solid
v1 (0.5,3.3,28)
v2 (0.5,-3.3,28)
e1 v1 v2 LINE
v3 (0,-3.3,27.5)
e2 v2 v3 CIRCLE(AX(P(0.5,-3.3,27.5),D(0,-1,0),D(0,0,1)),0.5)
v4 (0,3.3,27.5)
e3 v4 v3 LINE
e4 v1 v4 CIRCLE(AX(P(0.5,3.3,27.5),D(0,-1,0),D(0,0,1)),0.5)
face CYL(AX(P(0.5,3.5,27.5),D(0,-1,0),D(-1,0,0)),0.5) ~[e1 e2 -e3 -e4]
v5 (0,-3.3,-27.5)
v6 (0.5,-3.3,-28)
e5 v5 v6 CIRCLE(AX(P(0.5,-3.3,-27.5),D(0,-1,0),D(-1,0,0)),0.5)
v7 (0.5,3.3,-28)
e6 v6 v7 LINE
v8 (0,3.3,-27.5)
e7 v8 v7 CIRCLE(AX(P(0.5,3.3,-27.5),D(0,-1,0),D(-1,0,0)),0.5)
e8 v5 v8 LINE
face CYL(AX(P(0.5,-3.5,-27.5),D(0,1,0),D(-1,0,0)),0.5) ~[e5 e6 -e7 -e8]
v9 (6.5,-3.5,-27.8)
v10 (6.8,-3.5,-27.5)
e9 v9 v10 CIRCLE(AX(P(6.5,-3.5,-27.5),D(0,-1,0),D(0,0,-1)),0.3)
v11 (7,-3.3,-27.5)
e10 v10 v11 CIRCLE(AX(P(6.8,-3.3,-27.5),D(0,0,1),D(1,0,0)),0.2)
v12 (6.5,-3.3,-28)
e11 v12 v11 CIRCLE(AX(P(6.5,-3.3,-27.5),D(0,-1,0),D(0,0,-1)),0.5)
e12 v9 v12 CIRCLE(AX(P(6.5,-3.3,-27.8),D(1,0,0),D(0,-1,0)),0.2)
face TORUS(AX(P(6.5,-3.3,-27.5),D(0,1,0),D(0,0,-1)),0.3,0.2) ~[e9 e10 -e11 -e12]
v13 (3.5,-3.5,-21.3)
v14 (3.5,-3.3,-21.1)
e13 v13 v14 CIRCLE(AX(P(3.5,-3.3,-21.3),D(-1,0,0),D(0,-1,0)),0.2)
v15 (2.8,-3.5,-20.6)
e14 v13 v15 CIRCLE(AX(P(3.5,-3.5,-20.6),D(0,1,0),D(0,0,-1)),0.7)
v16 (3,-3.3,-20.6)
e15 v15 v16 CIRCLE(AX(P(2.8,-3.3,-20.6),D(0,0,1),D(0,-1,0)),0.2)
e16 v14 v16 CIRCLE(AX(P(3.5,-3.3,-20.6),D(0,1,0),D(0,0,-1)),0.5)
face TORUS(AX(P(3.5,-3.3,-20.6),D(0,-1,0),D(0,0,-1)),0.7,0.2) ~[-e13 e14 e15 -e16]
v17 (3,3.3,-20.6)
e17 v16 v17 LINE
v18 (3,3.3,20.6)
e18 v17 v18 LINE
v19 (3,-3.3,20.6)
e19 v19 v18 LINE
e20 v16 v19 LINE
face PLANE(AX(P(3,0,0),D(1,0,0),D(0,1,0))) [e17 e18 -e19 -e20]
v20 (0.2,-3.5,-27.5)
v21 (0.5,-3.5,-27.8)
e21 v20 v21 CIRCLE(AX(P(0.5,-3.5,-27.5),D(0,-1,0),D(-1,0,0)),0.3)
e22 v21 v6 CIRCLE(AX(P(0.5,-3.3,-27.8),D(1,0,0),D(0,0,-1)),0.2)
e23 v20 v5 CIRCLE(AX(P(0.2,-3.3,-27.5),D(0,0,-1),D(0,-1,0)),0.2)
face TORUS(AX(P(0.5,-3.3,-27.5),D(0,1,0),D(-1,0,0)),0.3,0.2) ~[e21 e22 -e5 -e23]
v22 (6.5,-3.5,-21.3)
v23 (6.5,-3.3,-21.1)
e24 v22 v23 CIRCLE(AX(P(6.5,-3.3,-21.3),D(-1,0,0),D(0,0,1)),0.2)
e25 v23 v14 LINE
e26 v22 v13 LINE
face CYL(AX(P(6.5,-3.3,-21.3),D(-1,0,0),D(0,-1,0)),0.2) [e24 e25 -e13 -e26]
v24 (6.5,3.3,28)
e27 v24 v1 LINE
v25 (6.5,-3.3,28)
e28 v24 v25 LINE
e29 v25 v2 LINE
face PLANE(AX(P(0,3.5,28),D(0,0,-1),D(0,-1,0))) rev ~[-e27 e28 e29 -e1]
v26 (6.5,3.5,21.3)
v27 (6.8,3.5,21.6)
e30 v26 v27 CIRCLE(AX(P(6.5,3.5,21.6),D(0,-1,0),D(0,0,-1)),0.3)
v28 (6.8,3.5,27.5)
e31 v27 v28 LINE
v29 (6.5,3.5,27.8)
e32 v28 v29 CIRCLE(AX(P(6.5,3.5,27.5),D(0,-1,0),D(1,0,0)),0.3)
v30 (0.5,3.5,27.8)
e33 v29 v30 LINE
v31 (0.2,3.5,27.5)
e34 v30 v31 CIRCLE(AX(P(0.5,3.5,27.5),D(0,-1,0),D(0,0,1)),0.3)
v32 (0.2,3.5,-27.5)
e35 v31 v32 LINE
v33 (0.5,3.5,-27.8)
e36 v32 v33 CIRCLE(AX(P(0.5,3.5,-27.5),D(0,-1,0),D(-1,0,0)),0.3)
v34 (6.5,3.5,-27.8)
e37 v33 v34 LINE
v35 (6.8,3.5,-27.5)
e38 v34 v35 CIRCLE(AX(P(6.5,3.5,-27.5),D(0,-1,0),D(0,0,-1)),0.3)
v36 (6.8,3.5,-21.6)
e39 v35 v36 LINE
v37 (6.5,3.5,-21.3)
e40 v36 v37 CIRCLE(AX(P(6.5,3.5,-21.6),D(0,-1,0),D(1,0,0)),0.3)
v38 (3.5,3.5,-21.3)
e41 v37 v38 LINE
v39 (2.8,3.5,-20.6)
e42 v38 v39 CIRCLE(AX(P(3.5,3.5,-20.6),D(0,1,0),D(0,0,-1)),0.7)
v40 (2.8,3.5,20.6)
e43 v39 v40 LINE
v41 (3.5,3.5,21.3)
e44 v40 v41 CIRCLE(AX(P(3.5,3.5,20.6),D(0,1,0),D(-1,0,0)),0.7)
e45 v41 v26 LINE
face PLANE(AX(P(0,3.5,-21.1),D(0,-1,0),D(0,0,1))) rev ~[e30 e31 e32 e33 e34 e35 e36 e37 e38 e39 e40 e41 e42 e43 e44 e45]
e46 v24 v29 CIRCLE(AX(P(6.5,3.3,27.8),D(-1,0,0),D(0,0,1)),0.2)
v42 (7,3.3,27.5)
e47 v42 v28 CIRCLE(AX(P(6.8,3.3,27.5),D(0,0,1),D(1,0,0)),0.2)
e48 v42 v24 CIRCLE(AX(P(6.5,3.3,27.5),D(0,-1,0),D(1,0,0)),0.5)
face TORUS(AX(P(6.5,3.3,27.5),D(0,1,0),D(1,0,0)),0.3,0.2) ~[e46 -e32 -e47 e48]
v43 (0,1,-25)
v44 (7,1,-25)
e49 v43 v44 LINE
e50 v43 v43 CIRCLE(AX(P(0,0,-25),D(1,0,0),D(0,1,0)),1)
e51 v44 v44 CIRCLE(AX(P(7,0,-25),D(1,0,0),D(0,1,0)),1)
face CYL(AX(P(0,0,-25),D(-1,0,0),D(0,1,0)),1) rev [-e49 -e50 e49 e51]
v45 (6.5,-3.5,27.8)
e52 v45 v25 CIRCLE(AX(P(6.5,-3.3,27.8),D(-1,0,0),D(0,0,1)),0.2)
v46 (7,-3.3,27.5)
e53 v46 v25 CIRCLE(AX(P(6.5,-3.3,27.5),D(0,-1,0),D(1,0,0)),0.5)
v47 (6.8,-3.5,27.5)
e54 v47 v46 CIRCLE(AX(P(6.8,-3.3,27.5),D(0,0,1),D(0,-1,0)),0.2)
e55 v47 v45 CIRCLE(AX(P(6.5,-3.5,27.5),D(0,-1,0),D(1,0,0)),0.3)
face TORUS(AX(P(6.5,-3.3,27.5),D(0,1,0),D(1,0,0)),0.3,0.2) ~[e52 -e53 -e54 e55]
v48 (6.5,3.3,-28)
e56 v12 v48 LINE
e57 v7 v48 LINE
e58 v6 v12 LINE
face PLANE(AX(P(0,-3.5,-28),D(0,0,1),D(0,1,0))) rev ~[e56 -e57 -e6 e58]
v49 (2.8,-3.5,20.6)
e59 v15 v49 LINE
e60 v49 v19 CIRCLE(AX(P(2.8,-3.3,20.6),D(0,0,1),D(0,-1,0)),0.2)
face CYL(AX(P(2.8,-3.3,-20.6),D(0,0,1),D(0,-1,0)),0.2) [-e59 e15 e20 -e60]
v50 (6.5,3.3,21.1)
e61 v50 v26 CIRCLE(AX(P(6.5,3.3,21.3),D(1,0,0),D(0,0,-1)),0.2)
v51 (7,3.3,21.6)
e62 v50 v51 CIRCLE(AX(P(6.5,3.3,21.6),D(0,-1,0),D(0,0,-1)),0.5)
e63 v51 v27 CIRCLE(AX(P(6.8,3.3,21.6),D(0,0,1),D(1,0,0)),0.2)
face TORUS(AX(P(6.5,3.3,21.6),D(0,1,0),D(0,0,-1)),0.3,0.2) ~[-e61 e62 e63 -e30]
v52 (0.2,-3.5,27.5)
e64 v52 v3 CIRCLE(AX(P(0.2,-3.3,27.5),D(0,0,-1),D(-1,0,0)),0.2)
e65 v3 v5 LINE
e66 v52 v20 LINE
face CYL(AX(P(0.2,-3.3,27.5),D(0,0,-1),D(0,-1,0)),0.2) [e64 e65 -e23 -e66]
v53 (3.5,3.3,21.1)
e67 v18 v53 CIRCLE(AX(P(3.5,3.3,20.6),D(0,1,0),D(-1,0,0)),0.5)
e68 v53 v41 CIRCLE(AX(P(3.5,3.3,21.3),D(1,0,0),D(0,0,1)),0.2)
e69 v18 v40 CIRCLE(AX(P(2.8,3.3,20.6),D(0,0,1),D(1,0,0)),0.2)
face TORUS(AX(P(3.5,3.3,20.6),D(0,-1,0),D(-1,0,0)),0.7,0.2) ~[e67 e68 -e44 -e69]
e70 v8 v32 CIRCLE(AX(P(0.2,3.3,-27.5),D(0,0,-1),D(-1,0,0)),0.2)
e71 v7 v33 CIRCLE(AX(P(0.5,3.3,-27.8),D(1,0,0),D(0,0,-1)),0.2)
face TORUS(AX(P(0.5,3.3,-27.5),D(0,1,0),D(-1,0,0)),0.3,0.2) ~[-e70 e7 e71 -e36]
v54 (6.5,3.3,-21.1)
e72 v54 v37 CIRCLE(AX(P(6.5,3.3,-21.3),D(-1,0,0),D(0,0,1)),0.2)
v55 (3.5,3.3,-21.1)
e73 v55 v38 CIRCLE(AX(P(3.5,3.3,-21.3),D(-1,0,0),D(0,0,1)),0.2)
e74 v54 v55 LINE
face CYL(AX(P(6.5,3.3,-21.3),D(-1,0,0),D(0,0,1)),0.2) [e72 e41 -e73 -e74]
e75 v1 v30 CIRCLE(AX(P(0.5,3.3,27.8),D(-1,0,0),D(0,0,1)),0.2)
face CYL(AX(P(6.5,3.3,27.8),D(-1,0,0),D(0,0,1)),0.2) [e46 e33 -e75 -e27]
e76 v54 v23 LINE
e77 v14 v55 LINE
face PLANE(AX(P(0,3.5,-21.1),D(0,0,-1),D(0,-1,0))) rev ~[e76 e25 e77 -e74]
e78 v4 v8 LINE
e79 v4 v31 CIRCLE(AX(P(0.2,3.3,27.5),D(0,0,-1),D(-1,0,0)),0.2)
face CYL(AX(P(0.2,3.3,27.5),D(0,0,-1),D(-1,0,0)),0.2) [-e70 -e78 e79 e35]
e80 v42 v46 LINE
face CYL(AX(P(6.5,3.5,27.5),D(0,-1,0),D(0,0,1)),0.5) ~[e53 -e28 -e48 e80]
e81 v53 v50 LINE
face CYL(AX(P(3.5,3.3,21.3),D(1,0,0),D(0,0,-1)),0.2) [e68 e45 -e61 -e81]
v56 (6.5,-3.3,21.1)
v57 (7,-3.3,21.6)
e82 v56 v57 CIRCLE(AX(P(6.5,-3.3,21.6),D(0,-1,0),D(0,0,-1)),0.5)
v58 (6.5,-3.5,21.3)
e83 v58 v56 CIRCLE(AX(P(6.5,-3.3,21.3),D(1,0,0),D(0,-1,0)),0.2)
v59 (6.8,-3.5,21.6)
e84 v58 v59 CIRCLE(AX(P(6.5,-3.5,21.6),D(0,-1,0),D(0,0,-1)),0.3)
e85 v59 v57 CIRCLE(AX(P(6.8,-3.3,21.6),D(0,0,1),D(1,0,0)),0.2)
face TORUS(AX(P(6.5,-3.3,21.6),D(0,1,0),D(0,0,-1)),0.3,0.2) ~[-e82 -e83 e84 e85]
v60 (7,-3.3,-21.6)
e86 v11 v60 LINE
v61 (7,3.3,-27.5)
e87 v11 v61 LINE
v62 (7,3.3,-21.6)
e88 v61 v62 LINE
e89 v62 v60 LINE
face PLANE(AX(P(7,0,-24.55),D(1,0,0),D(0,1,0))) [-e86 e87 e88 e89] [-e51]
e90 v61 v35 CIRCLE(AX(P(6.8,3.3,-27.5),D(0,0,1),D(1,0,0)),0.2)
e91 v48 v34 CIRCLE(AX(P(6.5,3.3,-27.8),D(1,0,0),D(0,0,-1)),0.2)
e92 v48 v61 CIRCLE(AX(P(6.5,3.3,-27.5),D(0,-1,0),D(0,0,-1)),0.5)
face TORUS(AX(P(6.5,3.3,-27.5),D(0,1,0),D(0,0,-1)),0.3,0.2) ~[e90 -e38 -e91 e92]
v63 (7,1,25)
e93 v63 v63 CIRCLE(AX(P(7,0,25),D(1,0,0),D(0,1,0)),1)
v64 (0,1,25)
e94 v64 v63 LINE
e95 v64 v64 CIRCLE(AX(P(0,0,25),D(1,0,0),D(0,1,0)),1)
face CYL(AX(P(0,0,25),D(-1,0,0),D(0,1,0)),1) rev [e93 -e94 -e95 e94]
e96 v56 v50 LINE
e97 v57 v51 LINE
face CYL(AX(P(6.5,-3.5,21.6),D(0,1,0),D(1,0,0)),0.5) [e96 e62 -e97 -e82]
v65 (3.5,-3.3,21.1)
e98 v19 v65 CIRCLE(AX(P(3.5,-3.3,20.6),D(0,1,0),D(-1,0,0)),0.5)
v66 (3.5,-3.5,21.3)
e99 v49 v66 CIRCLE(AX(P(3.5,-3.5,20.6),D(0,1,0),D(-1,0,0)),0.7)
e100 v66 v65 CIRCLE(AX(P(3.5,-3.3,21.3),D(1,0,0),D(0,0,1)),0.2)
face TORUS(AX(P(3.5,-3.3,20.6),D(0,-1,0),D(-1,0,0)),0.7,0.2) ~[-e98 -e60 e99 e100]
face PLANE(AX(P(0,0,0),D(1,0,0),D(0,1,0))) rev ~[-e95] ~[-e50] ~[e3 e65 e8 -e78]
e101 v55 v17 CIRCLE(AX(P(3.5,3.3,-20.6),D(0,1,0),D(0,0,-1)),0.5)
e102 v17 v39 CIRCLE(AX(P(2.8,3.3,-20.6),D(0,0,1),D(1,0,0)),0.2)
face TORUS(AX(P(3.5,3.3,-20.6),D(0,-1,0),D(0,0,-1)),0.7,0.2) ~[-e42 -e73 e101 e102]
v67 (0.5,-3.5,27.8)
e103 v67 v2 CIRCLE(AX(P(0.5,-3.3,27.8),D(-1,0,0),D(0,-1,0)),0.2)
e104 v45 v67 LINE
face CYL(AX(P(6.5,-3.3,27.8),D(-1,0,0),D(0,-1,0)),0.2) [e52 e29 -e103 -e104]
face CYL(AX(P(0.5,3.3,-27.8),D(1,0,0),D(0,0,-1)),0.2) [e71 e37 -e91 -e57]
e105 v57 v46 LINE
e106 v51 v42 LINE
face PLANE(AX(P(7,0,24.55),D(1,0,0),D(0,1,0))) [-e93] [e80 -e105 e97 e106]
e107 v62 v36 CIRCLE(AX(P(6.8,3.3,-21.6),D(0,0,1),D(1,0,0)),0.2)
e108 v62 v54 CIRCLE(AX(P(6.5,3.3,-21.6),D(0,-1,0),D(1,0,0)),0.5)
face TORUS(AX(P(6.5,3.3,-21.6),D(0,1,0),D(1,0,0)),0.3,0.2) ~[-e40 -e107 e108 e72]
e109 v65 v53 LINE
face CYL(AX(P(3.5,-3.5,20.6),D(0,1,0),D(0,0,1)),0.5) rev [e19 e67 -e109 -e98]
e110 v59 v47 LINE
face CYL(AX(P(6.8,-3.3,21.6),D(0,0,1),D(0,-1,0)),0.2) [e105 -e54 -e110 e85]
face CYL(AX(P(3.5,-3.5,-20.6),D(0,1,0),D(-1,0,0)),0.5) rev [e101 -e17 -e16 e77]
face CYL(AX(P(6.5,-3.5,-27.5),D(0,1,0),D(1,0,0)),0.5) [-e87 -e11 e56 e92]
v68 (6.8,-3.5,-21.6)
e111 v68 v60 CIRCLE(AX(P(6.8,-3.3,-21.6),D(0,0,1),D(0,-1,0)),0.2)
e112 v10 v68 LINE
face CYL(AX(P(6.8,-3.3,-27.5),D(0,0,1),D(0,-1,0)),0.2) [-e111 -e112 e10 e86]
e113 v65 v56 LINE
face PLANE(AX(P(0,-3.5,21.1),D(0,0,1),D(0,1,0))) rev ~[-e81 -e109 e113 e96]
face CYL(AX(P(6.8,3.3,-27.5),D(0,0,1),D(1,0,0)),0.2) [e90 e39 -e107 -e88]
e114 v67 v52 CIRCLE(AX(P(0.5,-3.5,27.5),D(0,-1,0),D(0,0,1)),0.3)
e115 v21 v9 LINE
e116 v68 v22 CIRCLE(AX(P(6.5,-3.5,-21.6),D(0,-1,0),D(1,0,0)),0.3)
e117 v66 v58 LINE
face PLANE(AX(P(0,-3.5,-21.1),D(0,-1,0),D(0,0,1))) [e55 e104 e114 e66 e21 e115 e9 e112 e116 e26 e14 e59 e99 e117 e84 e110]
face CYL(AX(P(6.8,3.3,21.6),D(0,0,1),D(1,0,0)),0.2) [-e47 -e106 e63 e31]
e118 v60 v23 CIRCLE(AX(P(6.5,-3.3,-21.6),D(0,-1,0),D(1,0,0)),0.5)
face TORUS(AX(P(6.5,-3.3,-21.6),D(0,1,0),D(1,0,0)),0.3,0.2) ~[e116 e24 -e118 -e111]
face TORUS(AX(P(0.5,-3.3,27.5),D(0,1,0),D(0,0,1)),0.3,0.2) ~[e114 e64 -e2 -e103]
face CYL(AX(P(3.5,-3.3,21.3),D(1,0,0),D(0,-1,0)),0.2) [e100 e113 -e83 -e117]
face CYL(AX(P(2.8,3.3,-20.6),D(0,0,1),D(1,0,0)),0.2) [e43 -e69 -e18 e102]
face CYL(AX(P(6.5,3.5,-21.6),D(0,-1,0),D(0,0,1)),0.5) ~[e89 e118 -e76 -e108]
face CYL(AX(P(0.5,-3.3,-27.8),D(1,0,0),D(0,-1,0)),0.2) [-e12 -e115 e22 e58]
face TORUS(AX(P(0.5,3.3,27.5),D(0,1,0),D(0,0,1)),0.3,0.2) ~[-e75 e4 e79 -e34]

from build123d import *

# Parameters (mm, degrees)
F0_R     = 1
F1_DEPTH = 7
F0_W     = 7
F0_H     = 42.2
F2_DEPTH = 3
F3_R     = 0.5
F4_R     = 0.2


with BuildPart() as f1:
    # F0 (on Right) → F1 (new body)
    with BuildSketch(Plane.YZ):
        Polygon((3.5, -22.5), (3.5, -21.1), (-3.5, -21.1), (-3.5, -22.5), (-3.5, -28), (3.5, -28), align=None)
        with Locations((0, -25)):
            Circle(F0_R, mode=Mode.SUBTRACT)
    extrude(amount=F1_DEPTH)



with BuildPart() as f1b:
    # F0 (on Right) → F1, piece 2 (new body)
    with BuildSketch(Plane.YZ):
        Polygon((3.5, 22.5), (3.5, 28), (-3.5, 28), (-3.5, 22.5), (-3.5, 21.1), (3.5, 21.1), align=None)
        with Locations((0, 25)):
            Circle(F0_R, mode=Mode.SUBTRACT)
    extrude(amount=F1_DEPTH)


with BuildPart() as f1_1:
    add(f1.part)

    add(f1b.part)  # F2 merges F1b
    # F0 (on Right) → F2 (join)
    with BuildSketch(Plane.YZ):
        Rectangle(F0_W, F0_H)
    extrude(amount=F2_DEPTH)

    # F3
    f3_edges = [f1_1.edges().sort_by_distance(p)[0] for p in [
        (7, 0, -21.1),
        (7, 0, -28),
        (7, 0, 21.1),
        (7, 0, 28),
        (0, 0, 28),
        (0, 0, -28),
        (3, 0, 21.1),
        (3, 0, -21.1),
    ]]
    fillet(f3_edges, radius=F3_R)

    # F4
    f4_edges = [f1_1.edges().sort_by_distance(p)[0] for p in [
        (3, 3.5, 0),
        (3, -3.5, 0),
        (3.5, 3.5, 28),
        (0.146447, 3.5, 27.853553),
        (6.853553, 3.5, 27.853553),
        (0, 3.5, 0),
        (7, 3.5, 24.55),
        (0.146447, 3.5, -27.853553),
        (6.853553, 3.5, 21.246447),
        (3.5, 3.5, -28),
        (5, 3.5, 21.1),
        (6.853553, 3.5, -27.853553),
        (3.146447, 3.5, 20.953553),
        (7, 3.5, -24.55),
        (6.853553, 3.5, -21.246447),
        (3.146447, 3.5, -20.953553),
        (5, 3.5, -21.1),
        (3.5, -3.5, 28),
        (0.146447, -3.5, 27.853553),
        (6.853553, -3.5, 27.853553),
        (0, -3.5, 0),
        (7, -3.5, 24.55),
        (0.146447, -3.5, -27.853553),
        (6.853553, -3.5, 21.246447),
        (3.5, -3.5, -28),
        (5, -3.5, 21.1),
        (6.853553, -3.5, -27.853553),
        (3.146447, -3.5, 20.953553),
        (7, -3.5, -24.55),
        (6.853553, -3.5, -21.246447),
        (3.146447, -3.5, -20.953553),
        (5, -3.5, -21.1),
    ]]
    fillet(f4_edges, radius=F4_R)


solid = f1_1.part
